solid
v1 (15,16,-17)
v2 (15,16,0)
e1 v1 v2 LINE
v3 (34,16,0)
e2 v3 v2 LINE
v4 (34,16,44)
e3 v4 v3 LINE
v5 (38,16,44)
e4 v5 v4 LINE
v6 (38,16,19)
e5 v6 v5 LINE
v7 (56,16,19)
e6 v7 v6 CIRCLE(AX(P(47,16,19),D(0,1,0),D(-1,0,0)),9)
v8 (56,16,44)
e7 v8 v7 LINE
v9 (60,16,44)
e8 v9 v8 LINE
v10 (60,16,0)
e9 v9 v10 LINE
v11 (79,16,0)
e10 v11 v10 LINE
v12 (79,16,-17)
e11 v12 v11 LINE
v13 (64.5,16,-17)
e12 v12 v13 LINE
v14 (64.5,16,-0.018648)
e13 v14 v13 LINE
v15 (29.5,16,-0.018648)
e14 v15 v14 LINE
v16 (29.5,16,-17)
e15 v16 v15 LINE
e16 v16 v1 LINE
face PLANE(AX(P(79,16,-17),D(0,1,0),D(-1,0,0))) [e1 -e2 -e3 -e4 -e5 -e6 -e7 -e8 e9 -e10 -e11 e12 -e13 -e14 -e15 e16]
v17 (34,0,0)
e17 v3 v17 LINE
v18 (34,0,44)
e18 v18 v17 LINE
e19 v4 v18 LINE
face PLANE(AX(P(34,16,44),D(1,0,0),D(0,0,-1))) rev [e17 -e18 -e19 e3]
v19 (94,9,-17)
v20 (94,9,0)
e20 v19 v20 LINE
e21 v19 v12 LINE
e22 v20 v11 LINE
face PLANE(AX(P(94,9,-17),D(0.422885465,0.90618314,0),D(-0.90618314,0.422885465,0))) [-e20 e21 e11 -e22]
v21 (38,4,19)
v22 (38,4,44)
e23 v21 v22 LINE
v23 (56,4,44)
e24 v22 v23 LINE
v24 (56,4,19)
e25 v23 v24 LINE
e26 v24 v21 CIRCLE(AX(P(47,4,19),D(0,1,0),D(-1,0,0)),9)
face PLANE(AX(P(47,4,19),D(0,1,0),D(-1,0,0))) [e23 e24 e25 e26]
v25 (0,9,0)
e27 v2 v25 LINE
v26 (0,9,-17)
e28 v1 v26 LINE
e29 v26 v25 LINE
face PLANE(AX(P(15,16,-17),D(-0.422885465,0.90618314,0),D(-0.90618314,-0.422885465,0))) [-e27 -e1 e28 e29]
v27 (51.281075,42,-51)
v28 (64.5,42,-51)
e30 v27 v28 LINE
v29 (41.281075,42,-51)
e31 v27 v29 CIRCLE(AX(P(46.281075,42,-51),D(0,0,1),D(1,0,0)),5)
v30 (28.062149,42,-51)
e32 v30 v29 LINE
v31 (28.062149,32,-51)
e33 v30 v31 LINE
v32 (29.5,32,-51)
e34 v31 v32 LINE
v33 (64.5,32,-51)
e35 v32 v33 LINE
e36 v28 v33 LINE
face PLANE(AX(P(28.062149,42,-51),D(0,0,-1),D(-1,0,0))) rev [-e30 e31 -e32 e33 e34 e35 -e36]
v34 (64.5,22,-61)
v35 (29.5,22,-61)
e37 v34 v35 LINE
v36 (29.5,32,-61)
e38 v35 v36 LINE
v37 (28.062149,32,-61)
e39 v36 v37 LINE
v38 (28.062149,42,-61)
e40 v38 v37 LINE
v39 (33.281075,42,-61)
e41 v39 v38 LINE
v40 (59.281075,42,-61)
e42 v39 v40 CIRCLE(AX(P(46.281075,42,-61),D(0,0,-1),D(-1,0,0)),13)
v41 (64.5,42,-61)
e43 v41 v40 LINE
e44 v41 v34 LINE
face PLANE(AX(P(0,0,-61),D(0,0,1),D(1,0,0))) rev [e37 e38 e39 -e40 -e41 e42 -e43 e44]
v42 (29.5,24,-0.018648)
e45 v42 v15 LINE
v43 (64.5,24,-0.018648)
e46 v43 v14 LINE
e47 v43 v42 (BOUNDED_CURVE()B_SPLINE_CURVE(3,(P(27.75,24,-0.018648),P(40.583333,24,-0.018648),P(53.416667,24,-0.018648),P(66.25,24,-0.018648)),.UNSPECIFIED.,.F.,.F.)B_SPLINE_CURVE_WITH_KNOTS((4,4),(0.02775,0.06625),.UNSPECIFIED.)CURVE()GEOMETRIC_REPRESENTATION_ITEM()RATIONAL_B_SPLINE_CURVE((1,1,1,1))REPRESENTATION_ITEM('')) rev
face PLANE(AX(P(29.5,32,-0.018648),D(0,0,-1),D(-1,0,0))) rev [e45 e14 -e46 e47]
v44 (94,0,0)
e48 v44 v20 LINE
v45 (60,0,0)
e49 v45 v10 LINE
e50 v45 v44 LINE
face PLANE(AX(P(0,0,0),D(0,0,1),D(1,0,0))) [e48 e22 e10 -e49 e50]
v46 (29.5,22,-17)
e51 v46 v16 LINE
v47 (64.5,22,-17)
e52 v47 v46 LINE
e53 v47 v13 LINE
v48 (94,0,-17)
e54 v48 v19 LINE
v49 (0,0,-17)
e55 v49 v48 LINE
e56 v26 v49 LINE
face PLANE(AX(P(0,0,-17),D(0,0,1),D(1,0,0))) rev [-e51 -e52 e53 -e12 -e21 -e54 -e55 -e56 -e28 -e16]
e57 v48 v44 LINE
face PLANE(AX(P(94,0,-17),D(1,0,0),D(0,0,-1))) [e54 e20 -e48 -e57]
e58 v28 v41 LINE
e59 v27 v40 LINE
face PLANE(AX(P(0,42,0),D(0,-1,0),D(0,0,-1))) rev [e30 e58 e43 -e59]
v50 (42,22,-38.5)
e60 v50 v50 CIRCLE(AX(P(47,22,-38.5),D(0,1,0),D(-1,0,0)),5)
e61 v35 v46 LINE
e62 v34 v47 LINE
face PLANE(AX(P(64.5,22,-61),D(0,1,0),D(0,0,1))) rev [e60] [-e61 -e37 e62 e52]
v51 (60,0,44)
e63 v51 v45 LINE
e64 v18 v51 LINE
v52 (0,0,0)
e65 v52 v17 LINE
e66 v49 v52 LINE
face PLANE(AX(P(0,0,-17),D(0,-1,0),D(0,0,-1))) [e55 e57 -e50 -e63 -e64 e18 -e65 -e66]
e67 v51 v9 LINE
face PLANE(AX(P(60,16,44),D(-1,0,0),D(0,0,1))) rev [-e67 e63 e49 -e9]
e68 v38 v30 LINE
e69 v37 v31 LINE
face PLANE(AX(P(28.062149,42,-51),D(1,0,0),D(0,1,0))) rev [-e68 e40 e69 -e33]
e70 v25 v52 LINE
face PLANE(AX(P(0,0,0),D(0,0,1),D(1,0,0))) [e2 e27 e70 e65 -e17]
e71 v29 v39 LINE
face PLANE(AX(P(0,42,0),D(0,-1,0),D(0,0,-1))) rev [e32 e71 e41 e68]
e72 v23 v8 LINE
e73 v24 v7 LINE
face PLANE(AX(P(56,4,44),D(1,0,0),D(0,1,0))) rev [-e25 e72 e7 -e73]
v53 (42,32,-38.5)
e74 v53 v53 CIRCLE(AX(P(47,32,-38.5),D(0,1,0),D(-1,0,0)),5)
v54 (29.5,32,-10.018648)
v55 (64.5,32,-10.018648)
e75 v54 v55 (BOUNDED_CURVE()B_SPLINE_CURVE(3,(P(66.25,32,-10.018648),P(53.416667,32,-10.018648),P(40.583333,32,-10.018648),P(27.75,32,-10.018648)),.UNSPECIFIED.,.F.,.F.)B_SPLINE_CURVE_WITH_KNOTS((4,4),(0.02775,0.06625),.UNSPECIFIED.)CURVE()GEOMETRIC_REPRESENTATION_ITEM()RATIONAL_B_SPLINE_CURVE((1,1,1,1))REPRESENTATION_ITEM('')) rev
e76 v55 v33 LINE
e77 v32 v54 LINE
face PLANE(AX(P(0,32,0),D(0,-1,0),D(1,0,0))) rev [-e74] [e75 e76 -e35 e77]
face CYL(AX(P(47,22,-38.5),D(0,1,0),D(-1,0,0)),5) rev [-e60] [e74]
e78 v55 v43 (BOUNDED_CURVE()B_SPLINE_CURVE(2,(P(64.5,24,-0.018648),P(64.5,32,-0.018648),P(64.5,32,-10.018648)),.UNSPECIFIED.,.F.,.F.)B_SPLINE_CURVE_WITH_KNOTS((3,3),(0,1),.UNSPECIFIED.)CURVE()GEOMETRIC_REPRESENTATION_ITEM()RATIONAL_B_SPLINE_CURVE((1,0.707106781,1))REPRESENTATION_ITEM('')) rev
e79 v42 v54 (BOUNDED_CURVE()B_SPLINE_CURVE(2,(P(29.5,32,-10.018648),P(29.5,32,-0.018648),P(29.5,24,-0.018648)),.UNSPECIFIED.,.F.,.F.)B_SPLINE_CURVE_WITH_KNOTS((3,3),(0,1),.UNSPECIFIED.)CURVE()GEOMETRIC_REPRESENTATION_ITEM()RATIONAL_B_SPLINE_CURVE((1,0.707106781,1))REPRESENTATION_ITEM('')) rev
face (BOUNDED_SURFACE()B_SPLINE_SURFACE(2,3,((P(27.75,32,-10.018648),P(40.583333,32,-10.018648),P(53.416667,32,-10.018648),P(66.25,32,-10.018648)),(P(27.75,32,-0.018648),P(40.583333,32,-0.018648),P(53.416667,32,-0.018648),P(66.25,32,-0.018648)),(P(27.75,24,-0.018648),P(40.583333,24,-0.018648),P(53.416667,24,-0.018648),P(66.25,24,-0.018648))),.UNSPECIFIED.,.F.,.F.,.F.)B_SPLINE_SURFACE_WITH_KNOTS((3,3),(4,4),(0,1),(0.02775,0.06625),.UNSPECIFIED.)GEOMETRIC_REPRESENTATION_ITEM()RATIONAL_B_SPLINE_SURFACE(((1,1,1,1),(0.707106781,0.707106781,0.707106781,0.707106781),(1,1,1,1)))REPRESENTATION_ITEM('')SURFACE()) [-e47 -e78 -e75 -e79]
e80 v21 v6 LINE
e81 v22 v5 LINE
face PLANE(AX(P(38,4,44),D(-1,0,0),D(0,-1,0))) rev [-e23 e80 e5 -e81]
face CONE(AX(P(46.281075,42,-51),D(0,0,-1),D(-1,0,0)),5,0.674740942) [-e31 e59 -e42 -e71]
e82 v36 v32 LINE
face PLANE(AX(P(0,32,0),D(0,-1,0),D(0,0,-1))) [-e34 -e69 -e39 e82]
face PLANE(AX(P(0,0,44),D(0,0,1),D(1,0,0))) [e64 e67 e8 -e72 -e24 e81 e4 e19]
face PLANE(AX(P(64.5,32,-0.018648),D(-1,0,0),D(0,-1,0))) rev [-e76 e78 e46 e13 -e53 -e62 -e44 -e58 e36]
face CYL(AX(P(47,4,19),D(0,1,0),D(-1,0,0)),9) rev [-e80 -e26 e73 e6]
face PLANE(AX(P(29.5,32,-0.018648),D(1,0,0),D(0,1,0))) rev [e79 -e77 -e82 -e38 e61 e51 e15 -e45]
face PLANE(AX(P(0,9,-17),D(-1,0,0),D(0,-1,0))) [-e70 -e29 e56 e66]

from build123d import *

# Parameters (mm, degrees)
BOSS_EXTRU_1_DEPTH      = 17
ESQUISSE2_W             = 26
ESQUISSE2_H             = 16
BOSS_EXTRU_2_DEPTH      = 44
ENL_V_MAT_EXTRU_1_DEPTH = 12
ESQUISSE4_W             = 35
ESQUISSE4_H             = 16.981352254
BOSS_EXTRU_3_DEPTH      = 16
ESQUISSE5_W             = 35
ESQUISSE5_H             = 10
BOSS_EXTRU_4_DEPTH      = 44
ESQUISSE6_W             = 36.437850792
ESQUISSE6_H             = 10
BOSS_EXTRU_5_DEPTH      = 10
CONG_1_SIZE             = 10
CONG_1_SIZE_2           = 8
ESQUISSE8_R             = 5
ENL_V_MAT_EXTRU_2_DEPTH = 10


with BuildPart() as part:
    # Esquisse1 → Boss.-Extru.1 (new body)
    with BuildSketch(Plane.XY):
        Polygon((0, 0), (94, 0), (94, 9), (79, 16), (15, 16), (0, 9), align=None)
    extrude(amount=-BOSS_EXTRU_1_DEPTH)

    # Esquisse2 → Boss.-Extru.2 (add)
    with BuildSketch(Plane.XY):
        with Locations((47, 8)):
            Rectangle(ESQUISSE2_W, ESQUISSE2_H)
    extrude(amount=BOSS_EXTRU_2_DEPTH)

    # Esquisse3 → Enlèv. mat.-Extru.1 (cut)
    with BuildSketch(Plane(origin=(0, 16, 0), x_dir=(1, 0, 0), z_dir=(0, 1, 0))):
        with BuildLine():
            Line((38, -44), (56, -44))
            Line((56, -44), (56, -19))
            ThreePointArc((56, -19), (47, -10), (38, -19))
            Line((38, -19), (38, -44))
        make_face()
    extrude(amount=-ENL_V_MAT_EXTRU_1_DEPTH, mode=Mode.SUBTRACT)

    # Esquisse4 → Boss.-Extru.3 (add)
    with BuildSketch(Plane(origin=(0, 16, 0), x_dir=(1, 0, 0), z_dir=(0, 1, 0))):
        with Locations((47, 8.509323873)):
            Rectangle(ESQUISSE4_W, ESQUISSE4_H)
    extrude(amount=BOSS_EXTRU_3_DEPTH)

    # Esquisse5 → Boss.-Extru.4 (add)
    with BuildSketch(Plane(origin=(0, 0, -17), x_dir=(-1, 0, 0), z_dir=(0, 0, -1))):
        with Locations((-47, 27)):
            Rectangle(ESQUISSE5_W, ESQUISSE5_H)
    extrude(amount=BOSS_EXTRU_4_DEPTH)

    # Esquisse6 → Boss.-Extru.5 (add)
    with BuildSketch(Plane(origin=(0, 32, 0), x_dir=(1, 0, 0), z_dir=(0, 1, 0))):
        with Locations((46.281074604, 56)):
            Rectangle(ESQUISSE6_W, ESQUISSE6_H)
    extrude(amount=BOSS_EXTRU_5_DEPTH)

    # Congé1
    # an asymmetric fillet: 10, 8 mm, written as the material it takes off along each edge
    with BuildSketch(Plane(origin=(4.5, 32, -0.018647746), x_dir=(0, 0, -1), z_dir=(1, 0, 0))) as cong_1_piece_1:
        with BuildLine():
            Bezier((CONG_1_SIZE, 0), (0, 0), (0, -CONG_1_SIZE_2), weights=[1, 0.707106781, 1])
            Line((0, -CONG_1_SIZE_2), (0, 0))
            Line((0, 0), (CONG_1_SIZE, 0))
        make_face()
    extrude(amount=85, mode=Mode.SUBTRACT)

    # Esquisse8 → Enlèv. mat.-Extru.2 (cut)
    with BuildSketch(Plane(origin=(0, 32, 0), x_dir=(1, 0, 0), z_dir=(0, 1, 0))):
        with Locations(Location((47, 38.5, 0), (0, 0, 180))):
            Circle(ESQUISSE8_R)
    extrude(amount=-ENL_V_MAT_EXTRU_2_DEPTH, mode=Mode.SUBTRACT)

    # Esquisse9 → Lissage2 section 0
    with BuildSketch(Plane.XY.offset(-51)):
        with BuildLine():
            Line((41.281074604, 42), (51.281074604, 42))
            ThreePointArc((51.281074604, 42), (46.281074604, 47), (41.281074604, 42))
        make_face()
    # Esquisse10 → Lissage2 section 1
    with BuildSketch(Plane(origin=(0, 0, -61), x_dir=(-1, 0, 0), z_dir=(0, 0, -1))):
        with BuildLine():
            Line((-33.281074604, 42), (-59.281074604, 42))
            ThreePointArc((-59.281074604, 42), (-46.281074604, 55), (-33.281074604, 42))
        make_face()
    loft()


solid = part.part
